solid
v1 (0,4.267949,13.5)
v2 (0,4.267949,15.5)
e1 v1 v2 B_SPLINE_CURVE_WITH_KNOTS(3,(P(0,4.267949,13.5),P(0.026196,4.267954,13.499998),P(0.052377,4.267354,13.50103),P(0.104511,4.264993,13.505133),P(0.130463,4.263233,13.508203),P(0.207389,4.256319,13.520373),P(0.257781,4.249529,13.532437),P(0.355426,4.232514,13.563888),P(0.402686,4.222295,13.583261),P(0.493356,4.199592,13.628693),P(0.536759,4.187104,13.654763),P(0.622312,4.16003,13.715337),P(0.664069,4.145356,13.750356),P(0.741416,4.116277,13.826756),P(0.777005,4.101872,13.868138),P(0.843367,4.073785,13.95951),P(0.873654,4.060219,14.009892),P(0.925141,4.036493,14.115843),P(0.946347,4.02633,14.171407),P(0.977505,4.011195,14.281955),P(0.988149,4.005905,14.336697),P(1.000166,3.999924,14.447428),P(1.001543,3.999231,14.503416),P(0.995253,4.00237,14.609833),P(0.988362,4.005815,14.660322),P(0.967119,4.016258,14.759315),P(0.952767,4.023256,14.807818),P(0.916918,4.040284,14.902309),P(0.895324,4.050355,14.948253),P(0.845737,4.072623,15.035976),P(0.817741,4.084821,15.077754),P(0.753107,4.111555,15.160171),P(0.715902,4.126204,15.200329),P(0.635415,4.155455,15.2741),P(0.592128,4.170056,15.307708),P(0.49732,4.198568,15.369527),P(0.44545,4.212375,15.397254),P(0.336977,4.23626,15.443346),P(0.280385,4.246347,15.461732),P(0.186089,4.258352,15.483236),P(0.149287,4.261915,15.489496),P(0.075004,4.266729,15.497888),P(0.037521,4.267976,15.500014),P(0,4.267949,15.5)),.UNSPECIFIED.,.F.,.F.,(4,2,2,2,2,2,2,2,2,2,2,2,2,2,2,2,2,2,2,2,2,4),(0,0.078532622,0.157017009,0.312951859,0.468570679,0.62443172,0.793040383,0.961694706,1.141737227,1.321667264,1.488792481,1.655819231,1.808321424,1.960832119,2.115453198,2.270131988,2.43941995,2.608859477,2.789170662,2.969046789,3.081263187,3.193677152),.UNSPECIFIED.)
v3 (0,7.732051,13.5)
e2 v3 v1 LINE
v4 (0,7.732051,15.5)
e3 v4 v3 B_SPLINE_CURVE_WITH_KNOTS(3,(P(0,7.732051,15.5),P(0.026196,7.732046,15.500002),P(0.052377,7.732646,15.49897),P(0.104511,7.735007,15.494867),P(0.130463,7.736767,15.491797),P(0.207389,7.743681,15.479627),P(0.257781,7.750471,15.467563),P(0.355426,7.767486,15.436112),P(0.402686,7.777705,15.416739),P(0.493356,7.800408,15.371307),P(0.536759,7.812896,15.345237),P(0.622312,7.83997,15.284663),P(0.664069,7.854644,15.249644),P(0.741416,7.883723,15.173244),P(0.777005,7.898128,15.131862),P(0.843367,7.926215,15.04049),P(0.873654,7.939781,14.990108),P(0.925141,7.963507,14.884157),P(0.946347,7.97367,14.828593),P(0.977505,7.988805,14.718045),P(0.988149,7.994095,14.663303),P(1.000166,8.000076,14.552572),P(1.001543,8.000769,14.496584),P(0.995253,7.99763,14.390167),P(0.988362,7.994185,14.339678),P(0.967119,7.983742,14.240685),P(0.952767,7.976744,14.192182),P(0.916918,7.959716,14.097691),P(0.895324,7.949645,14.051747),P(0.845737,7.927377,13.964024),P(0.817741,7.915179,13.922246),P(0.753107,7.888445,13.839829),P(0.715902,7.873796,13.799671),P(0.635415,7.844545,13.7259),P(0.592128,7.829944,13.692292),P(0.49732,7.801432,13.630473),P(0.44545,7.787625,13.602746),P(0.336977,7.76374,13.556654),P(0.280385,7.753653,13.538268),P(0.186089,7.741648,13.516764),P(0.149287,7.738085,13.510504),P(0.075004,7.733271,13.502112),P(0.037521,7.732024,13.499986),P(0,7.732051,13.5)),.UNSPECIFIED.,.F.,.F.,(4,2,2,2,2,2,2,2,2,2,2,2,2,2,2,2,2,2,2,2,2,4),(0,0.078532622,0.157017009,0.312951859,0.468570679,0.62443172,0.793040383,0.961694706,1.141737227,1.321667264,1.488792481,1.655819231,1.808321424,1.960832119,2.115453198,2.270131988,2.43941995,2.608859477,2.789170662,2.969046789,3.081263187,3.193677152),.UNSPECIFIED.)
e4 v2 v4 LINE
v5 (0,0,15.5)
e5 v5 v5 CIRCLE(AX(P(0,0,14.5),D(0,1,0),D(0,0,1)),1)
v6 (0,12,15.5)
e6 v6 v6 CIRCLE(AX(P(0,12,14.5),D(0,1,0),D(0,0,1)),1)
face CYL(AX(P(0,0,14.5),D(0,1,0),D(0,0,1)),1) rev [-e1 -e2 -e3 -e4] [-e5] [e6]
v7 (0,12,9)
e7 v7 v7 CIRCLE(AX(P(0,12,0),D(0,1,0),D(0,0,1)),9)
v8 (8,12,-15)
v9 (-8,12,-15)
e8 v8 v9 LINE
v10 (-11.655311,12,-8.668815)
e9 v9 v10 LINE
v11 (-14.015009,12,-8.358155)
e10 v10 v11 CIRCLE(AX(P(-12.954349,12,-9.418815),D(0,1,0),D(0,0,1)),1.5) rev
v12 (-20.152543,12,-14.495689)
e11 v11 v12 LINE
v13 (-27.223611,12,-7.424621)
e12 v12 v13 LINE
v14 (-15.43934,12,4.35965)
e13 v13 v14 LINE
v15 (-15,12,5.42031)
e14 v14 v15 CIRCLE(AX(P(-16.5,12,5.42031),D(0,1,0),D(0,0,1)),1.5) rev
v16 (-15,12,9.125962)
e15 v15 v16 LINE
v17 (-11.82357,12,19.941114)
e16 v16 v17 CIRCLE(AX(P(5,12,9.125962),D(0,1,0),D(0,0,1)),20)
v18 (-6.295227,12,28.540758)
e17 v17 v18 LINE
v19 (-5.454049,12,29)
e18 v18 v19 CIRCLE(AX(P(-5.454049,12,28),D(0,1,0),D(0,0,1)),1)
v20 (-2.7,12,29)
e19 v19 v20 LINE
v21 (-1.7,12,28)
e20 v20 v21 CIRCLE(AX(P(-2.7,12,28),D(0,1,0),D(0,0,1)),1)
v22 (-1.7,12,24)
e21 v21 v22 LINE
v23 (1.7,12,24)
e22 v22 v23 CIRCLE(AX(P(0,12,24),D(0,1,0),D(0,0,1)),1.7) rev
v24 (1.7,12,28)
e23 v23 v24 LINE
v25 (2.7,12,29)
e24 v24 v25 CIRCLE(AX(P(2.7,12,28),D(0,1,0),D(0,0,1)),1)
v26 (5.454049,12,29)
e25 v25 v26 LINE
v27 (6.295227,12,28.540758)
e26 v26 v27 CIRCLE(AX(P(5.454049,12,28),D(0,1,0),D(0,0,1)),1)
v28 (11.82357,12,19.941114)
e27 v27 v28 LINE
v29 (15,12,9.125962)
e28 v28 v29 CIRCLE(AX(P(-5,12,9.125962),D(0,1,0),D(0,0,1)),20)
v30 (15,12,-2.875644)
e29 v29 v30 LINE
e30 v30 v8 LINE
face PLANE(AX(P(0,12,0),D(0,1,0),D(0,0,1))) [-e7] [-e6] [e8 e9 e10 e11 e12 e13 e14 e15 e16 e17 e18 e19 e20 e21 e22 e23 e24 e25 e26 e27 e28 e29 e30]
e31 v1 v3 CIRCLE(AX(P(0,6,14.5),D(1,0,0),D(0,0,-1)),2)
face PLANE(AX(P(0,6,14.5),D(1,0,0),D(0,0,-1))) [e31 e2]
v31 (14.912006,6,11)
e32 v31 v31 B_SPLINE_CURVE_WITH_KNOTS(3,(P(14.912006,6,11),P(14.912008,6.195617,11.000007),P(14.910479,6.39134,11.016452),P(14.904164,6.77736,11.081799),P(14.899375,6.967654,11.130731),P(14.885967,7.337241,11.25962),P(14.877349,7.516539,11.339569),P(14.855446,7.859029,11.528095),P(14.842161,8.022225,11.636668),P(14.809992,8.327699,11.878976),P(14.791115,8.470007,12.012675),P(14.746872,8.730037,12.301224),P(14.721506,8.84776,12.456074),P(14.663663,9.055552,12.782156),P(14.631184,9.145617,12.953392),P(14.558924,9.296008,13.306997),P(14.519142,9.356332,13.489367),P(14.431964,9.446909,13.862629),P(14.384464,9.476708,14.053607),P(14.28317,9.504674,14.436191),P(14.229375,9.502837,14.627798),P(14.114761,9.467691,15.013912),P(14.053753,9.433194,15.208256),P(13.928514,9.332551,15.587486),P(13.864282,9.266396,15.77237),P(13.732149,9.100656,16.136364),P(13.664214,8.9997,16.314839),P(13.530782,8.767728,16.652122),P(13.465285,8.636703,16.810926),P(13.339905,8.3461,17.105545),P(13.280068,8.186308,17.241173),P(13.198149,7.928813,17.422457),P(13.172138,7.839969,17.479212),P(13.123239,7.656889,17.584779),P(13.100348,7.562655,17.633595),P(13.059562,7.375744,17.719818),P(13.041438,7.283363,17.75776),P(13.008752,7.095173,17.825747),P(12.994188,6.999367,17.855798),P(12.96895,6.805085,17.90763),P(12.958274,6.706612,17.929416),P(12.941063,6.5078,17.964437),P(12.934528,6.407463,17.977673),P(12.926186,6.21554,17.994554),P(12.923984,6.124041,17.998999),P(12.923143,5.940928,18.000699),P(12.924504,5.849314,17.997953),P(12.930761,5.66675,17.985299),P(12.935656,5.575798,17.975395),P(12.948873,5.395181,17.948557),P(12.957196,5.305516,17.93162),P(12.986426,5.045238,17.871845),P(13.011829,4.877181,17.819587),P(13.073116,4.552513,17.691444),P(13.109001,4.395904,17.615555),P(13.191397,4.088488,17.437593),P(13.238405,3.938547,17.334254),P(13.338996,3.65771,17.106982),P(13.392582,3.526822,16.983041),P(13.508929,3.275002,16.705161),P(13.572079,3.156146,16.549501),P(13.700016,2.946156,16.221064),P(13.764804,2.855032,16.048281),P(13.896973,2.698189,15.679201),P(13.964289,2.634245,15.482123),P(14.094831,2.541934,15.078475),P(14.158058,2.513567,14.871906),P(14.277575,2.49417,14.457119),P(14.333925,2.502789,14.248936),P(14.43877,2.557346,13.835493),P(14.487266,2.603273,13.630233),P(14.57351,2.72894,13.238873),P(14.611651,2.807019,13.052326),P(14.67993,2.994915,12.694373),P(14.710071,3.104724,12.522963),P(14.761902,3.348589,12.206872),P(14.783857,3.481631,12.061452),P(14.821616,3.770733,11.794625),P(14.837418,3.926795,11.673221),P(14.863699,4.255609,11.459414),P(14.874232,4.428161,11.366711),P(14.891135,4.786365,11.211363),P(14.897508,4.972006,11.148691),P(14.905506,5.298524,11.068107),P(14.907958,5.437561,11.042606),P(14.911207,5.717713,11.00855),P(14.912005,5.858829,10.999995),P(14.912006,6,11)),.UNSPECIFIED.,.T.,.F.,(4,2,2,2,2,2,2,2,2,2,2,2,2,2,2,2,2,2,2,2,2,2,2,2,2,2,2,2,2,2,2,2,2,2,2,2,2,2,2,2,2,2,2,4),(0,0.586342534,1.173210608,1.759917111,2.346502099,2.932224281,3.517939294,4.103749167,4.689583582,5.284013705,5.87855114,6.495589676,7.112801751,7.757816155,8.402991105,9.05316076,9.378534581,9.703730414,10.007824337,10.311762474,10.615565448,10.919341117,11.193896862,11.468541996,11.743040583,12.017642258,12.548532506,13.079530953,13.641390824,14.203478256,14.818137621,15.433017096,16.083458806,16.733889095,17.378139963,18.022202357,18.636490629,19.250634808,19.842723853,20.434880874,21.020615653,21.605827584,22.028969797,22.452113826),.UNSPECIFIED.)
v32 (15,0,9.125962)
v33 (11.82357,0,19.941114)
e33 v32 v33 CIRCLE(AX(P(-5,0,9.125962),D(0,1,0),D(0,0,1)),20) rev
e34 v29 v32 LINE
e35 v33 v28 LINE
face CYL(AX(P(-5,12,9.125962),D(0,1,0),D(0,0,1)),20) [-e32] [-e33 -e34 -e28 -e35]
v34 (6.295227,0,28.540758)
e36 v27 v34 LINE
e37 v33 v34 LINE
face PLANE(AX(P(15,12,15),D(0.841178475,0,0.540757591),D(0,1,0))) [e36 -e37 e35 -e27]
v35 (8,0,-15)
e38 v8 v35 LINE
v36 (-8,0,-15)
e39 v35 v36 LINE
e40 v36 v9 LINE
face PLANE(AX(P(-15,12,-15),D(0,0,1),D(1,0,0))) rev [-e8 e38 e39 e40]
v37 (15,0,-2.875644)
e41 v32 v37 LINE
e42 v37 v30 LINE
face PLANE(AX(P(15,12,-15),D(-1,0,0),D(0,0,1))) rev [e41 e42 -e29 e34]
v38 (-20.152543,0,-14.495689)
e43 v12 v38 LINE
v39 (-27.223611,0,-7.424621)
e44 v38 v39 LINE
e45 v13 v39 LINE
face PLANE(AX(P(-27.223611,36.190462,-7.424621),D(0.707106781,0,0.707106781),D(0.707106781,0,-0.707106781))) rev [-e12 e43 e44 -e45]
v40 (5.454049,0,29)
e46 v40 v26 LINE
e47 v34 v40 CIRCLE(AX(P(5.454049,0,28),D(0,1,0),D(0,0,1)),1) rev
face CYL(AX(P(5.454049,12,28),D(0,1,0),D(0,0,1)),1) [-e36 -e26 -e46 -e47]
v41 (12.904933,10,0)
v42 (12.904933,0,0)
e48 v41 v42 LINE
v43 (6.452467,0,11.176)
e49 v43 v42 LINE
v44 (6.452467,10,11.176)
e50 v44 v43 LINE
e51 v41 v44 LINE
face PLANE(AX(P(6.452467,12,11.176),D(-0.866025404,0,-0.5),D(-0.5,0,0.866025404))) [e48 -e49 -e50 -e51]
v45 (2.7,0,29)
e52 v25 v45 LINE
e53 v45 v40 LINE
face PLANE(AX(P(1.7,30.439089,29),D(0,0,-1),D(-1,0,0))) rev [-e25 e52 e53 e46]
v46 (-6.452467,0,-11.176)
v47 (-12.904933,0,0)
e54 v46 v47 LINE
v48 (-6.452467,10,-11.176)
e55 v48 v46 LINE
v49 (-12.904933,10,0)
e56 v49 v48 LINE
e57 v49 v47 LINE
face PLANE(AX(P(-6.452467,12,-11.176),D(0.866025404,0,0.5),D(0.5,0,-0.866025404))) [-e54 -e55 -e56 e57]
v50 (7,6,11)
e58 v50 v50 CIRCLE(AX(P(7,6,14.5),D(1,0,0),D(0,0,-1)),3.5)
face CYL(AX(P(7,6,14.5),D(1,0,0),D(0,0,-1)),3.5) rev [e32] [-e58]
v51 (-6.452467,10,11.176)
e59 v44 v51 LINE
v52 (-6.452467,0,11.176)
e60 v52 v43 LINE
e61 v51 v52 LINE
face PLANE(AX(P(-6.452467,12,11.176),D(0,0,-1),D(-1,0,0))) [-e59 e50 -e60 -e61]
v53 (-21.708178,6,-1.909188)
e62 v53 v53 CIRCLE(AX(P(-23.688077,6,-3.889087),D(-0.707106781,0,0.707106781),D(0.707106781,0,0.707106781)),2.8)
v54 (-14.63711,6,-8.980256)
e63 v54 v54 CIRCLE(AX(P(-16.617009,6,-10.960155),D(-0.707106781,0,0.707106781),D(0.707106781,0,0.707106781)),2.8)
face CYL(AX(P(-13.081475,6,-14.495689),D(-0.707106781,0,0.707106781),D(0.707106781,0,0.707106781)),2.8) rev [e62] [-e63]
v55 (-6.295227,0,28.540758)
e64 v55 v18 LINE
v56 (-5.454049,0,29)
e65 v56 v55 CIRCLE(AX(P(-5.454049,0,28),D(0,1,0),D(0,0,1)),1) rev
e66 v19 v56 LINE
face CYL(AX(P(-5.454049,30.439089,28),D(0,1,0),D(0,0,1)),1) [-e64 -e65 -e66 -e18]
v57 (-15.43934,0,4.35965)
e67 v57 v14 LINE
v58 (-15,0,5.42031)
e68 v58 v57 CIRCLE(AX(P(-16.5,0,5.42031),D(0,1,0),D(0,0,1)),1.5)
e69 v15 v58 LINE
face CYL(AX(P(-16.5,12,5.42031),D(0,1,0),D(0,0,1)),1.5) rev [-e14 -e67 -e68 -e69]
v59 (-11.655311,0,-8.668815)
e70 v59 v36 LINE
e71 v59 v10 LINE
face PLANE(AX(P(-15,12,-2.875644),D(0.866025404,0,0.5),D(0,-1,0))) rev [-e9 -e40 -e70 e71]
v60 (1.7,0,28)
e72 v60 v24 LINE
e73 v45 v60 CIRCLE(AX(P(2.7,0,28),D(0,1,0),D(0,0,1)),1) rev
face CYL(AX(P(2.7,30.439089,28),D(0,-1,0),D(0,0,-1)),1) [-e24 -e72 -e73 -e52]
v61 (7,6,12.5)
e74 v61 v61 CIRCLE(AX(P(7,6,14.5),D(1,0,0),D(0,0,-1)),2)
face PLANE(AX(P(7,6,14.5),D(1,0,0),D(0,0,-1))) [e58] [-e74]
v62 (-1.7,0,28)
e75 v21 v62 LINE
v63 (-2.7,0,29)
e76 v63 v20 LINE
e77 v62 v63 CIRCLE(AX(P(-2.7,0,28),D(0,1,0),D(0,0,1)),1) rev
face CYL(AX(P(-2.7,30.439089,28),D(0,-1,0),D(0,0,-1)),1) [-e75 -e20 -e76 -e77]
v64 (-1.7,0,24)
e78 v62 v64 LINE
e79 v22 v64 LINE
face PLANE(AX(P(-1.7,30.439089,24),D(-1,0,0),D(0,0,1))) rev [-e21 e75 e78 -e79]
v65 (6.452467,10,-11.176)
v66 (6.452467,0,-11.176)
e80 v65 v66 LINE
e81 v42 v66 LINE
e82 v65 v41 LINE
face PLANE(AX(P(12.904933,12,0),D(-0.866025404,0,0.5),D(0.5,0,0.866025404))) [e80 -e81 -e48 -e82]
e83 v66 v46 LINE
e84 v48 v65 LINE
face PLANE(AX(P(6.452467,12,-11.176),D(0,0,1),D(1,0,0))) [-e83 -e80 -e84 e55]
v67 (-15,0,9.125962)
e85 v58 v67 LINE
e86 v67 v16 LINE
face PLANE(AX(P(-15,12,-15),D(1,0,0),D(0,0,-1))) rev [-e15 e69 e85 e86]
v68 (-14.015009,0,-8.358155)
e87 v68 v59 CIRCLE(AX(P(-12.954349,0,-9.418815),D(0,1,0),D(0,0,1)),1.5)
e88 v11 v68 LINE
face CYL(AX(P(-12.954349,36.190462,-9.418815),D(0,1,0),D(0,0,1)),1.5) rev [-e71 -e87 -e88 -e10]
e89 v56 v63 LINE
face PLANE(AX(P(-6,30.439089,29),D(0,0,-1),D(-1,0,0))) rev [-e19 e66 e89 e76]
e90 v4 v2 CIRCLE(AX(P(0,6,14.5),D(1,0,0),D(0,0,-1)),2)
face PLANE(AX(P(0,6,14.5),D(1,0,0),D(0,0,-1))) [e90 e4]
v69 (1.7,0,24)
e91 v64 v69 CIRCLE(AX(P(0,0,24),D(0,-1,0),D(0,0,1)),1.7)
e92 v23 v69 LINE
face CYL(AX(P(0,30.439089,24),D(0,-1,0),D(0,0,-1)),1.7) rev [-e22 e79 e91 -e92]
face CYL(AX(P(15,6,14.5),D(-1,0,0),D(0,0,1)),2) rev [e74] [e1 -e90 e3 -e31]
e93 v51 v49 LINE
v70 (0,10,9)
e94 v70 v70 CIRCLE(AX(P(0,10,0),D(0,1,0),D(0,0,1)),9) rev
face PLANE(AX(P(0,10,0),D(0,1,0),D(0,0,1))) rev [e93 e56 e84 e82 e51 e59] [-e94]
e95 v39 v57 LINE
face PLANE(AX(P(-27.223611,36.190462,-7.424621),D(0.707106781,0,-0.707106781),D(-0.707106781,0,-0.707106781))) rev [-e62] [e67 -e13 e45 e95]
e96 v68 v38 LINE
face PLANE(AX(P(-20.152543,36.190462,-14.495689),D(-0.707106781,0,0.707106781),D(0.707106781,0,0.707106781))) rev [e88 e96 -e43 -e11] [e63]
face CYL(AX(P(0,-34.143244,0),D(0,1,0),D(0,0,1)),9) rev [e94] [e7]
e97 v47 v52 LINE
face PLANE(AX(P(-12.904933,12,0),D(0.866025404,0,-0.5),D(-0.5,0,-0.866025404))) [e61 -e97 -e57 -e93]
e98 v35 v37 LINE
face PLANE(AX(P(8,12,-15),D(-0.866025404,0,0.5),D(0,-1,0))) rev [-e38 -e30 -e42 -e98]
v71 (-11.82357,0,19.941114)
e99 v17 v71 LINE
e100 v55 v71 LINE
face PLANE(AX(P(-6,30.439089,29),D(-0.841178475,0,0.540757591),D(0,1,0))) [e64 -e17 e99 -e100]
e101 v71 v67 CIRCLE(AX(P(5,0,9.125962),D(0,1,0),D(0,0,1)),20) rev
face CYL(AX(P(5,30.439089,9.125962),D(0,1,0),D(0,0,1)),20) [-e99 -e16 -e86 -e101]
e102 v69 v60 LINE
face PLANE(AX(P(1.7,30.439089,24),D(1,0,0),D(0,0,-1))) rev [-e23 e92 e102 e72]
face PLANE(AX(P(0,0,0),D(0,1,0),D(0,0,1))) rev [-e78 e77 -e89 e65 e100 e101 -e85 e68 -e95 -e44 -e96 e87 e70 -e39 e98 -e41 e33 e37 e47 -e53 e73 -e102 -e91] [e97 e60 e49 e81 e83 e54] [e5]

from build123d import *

# Parameters (mm, degrees)
SKETCH1_W           = 30
SKETCH1_H           = 30
BOSS_EXTRUDE1_DEPTH = 12
BOSS_EXTRUDE6_DEPTH = 12
CHAMFER1_SIZE       = 7
CHAMFER1_SIZE2      = 12.124355653
BOSS_EXTRUDE4_DEPTH = 12
SKETCH7_R           = 2.8
CUT_EXTRUDE2_DEPTH  = 15
CHAMFER2_SIZE       = 9
CHAMFER2_SIZE_2     = 14
CHAMFER3_SIZE       = 14
CHAMFER3_SIZE_2     = 9
FILLET2_R           = 20
FILLET3_R           = 1
FILLET4_R           = 1.5
SKETCH10_R          = 1
CUT_EXTRUDE3_DEPTH  = 42.546660516
SKETCH11_R          = 2
CUT_EXTRUDE4_DEPTH  = 42.546660516
SKETCH12_R          = 9
BOSS_EXTRUDE8_DEPTH = 2
SKETCH13_R          = 3.5
CUT_EXTRUDE5_DEPTH  = 8


with BuildPart() as part:
    # Sketch1 → Boss-Extrude1 (new body)
    with BuildSketch(Plane(origin=(0, 0, 0), x_dir=(1, 0, 0), z_dir=(0, 1, 0))):
        Rectangle(SKETCH1_W, SKETCH1_H)
        Polygon((6.452466608, -11.176), (12.904933217, 0), (6.452466608, 11.176), (-6.452466608, 11.176), (-12.904933217, 0), (-6.452466608, -11.176), align=None, mode=Mode.SUBTRACT)
    extrude(amount=BOSS_EXTRUDE1_DEPTH)

    # Sketch8 → Boss-Extrude6 (add)
    with BuildSketch(Plane(origin=(0, 0, 0), x_dir=(1, 0, 0), z_dir=(0, 1, 0))):
        with BuildLine():
            Line((-6, -15), (6, -15))
            Line((6, -15), (6, -29))
            Line((6, -29), (1.7, -29))
            Line((1.7, -29), (1.7, -24))
            ThreePointArc((1.7, -24), (0, -22.3), (-1.7, -24))
            Line((-1.7, -24), (-1.7, -29))
            Line((-1.7, -29), (-6, -29))
            Line((-6, -29), (-6, -15))
        make_face()
    extrude(amount=BOSS_EXTRUDE6_DEPTH)

    # Chamfer1
    chamfer1_edges = [part.edges().sort_by_distance(p)[0] for p in [
        (-15, 6, -15),
        (15, 6, -15),
    ]]
    chamfer1_side = [part.faces().sort_by_distance(p)[0] for p in [
        (0, 6, -15),
    ]]
    chamfer(chamfer1_edges, length=CHAMFER1_SIZE, length2=CHAMFER1_SIZE2, reference=chamfer1_side[0])

    # Sketch6 → Boss-Extrude4 (add)
    with BuildSketch(Plane(origin=(0, 0, 0), x_dir=(1, 0, 0), z_dir=(0, 1, 0))):
        Polygon((-27.223611076, 7.424621202), (-15, -4.798989873), (-15, 2.875644347), (-12.632730187, 6.975875938), (-20.152543264, 14.495689014), align=None)
    extrude(amount=BOSS_EXTRUDE4_DEPTH)

    # Sketch7 → Cut-Extrude2 (cut)
    with BuildSketch(Plane(origin=(-9.899494937, 0, 9.899494937), x_dir=(0.7071067811865438, 0, 0.7071067811865512), z_dir=(-0.7071067811865512, 0, 0.7071067811865438))):
        with Locations((-19.5, 6)):
            Circle(SKETCH7_R)
    extrude(amount=-CUT_EXTRUDE2_DEPTH, mode=Mode.SUBTRACT)

    # Chamfer2
    # the kernel refuses this chamfer: 14, 9 mm, written as the material it adds along each edge
    with BuildSketch(Plane(origin=(6, 0, 15), x_dir=(0.9987204462012896, 0, -0.05057143798130468), z_dir=(0, 1, 0))) as chamfer2_piece_1:
        Polygon((CHAMFER2_SIZE * 0.998720446201, -CHAMFER2_SIZE * 0.0505714379813), (-CHAMFER2_SIZE_2 * 0.0505714379813, -CHAMFER2_SIZE_2 * 0.998720446201), (0, 0), align=None)
    extrude(amount=12)

    # Chamfer3
    # the kernel refuses this chamfer: 14, 9 mm, written as the material it adds along each edge
    with BuildSketch(Plane(origin=(-6, 0, 15), x_dir=(0.020921616646829202, 0, 0.9997811190240007), z_dir=(0, 1, 0))) as chamfer3_piece_1:
        Polygon((CHAMFER3_SIZE * 0.999781119024, -CHAMFER3_SIZE * 0.0209216166468), (-CHAMFER3_SIZE_2 * 0.0209216166468, -CHAMFER3_SIZE_2 * 0.999781119024), (0, 0), align=None)
    extrude(amount=12)

    # Fillet2
    fillet2_edges = [part.edges().sort_by_distance(p)[0] for p in [
        (15, 6, 15),
        (-15, 6, 15),
    ]]
    fillet(fillet2_edges, radius=FILLET2_R)

    # Fillet3
    fillet3_edges = [part.edges().sort_by_distance(p)[0] for p in [
        (-6, 6, 29),
        (-1.7, 6, 29),
        (1.7, 6, 29),
        (6, 6, 29),
    ]]
    fillet(fillet3_edges, radius=FILLET3_R)

    # Fillet4
    fillet4_edges = [part.edges().sort_by_distance(p)[0] for p in [
        (-15, 6, 4.798989873),
        (-12.632730187, 6, -6.975875938),
    ]]
    fillet(fillet4_edges, radius=FILLET4_R)

    # Sketch10 → Cut-Extrude3 (cut, through all)
    with BuildSketch(Plane(origin=(0, 12, 0), x_dir=(1, 0, 0), z_dir=(0, 1, 0))):
        with Locations(Location((0, -14.5, 0), (0, 0, 270))):
            Circle(SKETCH10_R)
    extrude(amount=-CUT_EXTRUDE3_DEPTH, mode=Mode.SUBTRACT)

    # Sketch11 → Cut-Extrude4 (cut, through all)
    with BuildSketch(Plane(origin=(0, 0, 0), x_dir=(0, 0, -1), z_dir=(1, 0, 0))):
        with Locations(Location((-14.5, 6, 0), (0, 0, 180))):
            Circle(SKETCH11_R)
    extrude(amount=CUT_EXTRUDE4_DEPTH, mode=Mode.SUBTRACT)

    # Sketch12 → Boss-Extrude8 (add)
    with BuildSketch(Plane(origin=(0, 12, 0), x_dir=(1, 0, 0), z_dir=(0, 1, 0))):
        Polygon((6.452466608, 11.176), (-6.452466608, 11.176), (-12.904933217, 0), (-6.452466608, -11.176), (6.452466608, -11.176), (12.904933217, 0), align=None)
        with Locations(Location((0, 0, 0), (0, 0, 270))):
            Circle(SKETCH12_R, mode=Mode.SUBTRACT)
    extrude(amount=-BOSS_EXTRUDE8_DEPTH)

    # Sketch13 → Cut-Extrude5 (cut)
    with BuildSketch(Plane(origin=(15, 0, 0), x_dir=(0, 0, -1), z_dir=(1, 0, 0))):
        with Locations((-14.5, 6)):
            Circle(SKETCH13_R)
    extrude(amount=-CUT_EXTRUDE5_DEPTH, mode=Mode.SUBTRACT)


solid = part.part
